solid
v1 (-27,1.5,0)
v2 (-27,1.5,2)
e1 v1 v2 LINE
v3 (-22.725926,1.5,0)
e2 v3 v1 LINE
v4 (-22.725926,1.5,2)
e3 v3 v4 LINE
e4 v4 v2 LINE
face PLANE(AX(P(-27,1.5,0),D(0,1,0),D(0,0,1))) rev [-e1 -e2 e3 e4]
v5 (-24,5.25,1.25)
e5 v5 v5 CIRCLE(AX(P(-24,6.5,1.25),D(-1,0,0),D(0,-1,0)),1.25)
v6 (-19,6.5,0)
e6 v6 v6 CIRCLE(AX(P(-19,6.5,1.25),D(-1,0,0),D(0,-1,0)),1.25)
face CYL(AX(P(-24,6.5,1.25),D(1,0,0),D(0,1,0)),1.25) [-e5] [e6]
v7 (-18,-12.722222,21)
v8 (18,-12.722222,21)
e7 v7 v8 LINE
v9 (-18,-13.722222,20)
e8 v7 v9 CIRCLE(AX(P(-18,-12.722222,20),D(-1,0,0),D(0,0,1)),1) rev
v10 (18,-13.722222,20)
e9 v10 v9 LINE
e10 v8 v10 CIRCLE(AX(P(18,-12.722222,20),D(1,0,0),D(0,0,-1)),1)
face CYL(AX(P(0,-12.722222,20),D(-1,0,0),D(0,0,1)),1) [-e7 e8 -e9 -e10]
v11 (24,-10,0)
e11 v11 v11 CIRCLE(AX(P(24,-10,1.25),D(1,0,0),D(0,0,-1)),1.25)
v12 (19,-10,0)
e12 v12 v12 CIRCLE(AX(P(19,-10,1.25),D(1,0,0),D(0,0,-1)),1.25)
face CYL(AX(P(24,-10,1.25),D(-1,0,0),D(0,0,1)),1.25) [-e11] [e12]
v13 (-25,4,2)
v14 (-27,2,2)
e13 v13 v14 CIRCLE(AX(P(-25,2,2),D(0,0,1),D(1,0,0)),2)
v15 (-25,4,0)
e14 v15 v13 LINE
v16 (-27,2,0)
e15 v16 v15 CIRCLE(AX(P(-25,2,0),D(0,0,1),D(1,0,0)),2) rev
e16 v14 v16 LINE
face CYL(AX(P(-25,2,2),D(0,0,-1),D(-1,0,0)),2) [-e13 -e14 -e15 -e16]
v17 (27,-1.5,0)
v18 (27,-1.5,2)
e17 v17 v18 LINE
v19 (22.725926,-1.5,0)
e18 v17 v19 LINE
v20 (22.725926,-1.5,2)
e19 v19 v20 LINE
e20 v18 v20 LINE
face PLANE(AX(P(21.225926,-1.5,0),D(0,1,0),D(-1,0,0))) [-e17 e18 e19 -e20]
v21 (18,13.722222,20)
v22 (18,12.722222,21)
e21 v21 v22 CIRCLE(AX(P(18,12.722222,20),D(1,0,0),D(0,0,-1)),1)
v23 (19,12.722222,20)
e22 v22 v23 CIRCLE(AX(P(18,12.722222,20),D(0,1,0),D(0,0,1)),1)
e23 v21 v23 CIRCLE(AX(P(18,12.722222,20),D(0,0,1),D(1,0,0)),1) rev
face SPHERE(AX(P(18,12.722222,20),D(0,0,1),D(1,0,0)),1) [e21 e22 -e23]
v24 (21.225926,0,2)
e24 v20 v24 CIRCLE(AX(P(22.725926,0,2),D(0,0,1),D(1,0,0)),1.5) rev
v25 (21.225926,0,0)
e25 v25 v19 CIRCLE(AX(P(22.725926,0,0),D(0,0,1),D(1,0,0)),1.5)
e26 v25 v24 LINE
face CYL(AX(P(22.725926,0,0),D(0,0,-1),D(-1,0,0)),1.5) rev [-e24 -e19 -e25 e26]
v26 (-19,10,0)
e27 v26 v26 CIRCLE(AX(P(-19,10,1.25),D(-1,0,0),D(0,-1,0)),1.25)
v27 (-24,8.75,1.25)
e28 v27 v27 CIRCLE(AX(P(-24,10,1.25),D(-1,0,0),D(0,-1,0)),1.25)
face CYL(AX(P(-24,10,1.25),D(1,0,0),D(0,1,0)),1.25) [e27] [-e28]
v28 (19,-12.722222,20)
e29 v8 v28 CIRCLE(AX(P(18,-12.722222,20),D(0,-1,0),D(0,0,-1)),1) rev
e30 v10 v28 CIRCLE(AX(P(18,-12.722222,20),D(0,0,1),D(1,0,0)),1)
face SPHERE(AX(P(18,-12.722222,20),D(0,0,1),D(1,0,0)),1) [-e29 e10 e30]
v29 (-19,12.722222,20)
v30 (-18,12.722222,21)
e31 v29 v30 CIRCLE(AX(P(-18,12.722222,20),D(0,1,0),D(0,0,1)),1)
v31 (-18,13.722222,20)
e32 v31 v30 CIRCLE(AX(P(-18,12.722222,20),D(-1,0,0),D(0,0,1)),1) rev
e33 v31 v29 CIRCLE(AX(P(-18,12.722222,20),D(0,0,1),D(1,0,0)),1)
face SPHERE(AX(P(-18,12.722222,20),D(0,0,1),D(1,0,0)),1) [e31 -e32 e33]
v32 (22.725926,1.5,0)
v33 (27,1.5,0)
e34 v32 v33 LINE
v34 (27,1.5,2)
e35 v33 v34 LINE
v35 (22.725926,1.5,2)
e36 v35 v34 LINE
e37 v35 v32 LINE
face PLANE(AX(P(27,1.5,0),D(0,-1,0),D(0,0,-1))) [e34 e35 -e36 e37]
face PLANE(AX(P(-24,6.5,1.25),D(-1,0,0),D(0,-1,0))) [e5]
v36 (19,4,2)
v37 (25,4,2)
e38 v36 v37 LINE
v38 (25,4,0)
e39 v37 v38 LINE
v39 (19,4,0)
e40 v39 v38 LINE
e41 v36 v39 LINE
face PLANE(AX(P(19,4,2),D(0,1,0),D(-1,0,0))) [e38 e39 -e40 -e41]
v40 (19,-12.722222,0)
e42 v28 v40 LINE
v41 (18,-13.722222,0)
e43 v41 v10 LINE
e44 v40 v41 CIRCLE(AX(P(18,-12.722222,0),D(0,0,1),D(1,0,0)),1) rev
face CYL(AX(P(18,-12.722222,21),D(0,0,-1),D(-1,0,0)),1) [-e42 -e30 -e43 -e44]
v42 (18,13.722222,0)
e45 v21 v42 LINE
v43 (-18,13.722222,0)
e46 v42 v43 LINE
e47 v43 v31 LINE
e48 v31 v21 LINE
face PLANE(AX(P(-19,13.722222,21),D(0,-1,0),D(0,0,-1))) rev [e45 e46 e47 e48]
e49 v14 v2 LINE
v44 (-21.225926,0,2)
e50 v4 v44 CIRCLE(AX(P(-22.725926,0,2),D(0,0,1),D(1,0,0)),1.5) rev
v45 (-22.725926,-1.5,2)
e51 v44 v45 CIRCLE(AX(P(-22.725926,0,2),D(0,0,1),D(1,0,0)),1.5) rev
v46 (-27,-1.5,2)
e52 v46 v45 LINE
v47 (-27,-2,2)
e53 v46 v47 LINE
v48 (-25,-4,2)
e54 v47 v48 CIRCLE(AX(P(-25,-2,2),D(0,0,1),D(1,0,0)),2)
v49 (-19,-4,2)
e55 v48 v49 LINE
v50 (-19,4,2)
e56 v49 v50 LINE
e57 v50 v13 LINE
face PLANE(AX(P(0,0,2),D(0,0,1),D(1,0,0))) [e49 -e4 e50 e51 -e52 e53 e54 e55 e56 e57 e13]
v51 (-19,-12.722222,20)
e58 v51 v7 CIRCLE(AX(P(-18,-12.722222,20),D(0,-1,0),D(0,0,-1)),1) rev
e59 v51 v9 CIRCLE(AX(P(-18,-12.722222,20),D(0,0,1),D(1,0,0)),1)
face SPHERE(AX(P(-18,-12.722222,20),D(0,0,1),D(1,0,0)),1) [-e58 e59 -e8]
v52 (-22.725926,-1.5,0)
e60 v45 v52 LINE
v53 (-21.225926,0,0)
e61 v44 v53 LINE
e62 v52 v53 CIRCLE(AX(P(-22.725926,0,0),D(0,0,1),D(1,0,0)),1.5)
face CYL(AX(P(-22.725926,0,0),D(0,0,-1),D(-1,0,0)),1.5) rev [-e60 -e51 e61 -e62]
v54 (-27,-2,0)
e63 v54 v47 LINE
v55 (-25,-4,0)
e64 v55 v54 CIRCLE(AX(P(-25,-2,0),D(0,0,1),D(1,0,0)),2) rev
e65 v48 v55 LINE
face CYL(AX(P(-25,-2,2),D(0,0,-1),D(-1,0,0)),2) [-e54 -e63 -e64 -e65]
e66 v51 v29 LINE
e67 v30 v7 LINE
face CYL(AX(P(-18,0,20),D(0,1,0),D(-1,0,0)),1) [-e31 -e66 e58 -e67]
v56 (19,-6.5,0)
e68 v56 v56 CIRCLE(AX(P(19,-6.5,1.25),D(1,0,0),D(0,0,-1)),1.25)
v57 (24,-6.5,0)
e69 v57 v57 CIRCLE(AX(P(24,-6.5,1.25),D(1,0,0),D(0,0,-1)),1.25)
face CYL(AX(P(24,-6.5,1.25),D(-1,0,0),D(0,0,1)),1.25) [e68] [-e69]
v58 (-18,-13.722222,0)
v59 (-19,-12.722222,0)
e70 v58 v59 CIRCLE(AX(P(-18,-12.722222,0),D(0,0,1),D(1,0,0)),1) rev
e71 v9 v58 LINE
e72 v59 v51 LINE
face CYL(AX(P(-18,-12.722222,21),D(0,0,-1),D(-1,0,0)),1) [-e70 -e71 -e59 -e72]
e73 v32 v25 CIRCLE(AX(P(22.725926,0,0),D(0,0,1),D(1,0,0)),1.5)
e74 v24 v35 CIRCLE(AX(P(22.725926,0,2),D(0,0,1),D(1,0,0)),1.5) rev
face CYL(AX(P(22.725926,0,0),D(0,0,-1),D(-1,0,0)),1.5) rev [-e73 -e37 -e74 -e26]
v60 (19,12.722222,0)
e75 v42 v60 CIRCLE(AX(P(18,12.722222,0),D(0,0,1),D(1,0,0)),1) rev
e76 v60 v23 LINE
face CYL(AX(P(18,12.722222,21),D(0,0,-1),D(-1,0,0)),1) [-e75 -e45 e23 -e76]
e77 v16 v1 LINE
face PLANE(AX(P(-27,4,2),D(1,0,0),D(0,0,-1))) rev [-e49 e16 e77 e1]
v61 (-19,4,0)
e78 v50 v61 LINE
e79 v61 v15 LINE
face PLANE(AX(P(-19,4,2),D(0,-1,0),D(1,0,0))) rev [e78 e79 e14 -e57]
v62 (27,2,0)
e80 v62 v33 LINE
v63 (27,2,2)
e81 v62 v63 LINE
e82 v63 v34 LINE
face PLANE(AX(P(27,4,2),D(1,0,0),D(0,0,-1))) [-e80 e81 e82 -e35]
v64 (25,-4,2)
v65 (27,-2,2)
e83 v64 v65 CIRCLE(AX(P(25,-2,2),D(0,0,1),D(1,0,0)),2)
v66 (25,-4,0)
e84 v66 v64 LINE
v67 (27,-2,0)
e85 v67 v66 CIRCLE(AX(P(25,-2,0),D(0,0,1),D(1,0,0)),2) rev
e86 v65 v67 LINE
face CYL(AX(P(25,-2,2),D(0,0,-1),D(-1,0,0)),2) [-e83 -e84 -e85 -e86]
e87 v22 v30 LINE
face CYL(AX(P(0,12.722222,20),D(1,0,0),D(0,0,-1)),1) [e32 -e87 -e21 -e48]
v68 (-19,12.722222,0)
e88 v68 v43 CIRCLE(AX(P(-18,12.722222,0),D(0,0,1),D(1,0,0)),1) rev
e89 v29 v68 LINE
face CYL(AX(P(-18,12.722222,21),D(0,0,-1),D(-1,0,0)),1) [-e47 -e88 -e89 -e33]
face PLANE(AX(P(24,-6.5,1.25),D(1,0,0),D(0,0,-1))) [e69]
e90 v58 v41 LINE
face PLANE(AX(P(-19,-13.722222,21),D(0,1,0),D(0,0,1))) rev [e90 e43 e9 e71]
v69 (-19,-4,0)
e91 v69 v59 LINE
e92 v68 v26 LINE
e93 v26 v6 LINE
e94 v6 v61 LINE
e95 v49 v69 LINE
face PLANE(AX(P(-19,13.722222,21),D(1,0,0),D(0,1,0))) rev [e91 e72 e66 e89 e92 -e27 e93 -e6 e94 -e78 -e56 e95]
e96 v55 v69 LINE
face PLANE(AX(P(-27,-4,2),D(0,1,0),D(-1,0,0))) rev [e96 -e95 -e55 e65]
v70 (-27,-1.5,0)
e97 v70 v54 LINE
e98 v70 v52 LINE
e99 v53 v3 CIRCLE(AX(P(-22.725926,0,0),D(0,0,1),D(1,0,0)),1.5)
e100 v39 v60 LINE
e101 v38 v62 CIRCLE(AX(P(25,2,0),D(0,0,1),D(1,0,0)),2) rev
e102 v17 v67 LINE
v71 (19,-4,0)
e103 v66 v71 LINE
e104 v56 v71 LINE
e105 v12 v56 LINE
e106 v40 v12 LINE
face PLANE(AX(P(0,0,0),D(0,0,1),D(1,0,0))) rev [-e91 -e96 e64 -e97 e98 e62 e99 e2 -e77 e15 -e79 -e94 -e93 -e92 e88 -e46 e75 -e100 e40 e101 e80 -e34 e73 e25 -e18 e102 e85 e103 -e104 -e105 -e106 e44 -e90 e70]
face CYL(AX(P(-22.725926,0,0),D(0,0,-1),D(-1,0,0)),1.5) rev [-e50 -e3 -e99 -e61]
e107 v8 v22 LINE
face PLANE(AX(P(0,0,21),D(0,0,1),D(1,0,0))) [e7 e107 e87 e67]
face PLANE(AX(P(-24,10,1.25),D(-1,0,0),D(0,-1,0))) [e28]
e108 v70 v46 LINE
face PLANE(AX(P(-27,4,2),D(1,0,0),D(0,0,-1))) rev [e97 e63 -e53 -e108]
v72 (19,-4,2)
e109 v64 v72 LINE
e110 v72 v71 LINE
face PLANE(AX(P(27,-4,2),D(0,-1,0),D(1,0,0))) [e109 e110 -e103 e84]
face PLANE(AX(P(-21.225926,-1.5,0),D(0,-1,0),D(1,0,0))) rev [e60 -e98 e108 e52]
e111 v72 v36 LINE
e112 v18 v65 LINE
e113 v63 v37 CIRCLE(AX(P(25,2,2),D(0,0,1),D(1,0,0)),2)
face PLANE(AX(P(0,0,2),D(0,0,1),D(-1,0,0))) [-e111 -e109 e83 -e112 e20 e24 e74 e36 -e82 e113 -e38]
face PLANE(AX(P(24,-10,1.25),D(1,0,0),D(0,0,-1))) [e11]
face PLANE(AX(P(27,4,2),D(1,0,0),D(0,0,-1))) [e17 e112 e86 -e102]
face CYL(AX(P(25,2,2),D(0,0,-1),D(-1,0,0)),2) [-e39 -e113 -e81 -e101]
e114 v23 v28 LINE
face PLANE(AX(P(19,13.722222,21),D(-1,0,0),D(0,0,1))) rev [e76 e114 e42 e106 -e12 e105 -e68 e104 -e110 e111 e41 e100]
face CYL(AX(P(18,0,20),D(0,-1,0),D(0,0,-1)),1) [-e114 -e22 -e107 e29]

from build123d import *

# Parameters (mm, degrees)
SKETCH1_W            = 38
SKETCH1_H            = 27.444444444
BOSS_EXTRUDE1_DEPTH  = 21
SKETCH2_W            = 8
SKETCH2_H            = 8
BOSS_EXTRUDE2_DEPTH  = 2
SKETCH3_W            = 5.774074058
SKETCH3_H            = 3
CUT_EXTRUDE1_DEPTH   = 2
FILLET1_R            = 2
FILLET2_R            = 1.5
FILLET1_OF_MIRROR1_R = 2
FILLET2_OF_MIRROR1_R = 1.5
SKETCH5_R            = 1.25
BOSS_EXTRUDE3_DEPTH  = 5
SKETCH6_R            = 1.25
BOSS_EXTRUDE4_DEPTH  = 5
FILLET5_R            = 1


with BuildPart() as part:
    # Sketch1 → Boss-Extrude1 (new body)
    with BuildSketch(Plane.XY):
        Rectangle(SKETCH1_W, SKETCH1_H)
    extrude(amount=BOSS_EXTRUDE1_DEPTH)

    # Sketch2 → Boss-Extrude2 (add)
    with BuildSketch(Plane.XY):
        with Locations((-23, 0)):
            Rectangle(SKETCH2_W, SKETCH2_H)
    boss_extrude2 = extrude(amount=BOSS_EXTRUDE2_DEPTH)

    # Sketch3 → Cut-Extrude1 (cut)
    with BuildSketch(Plane.XY.offset(2)):
        with Locations((-24.112962971, 0)):
            Rectangle(SKETCH3_W, SKETCH3_H)
    cut_extrude1 = extrude(amount=-CUT_EXTRUDE1_DEPTH, mode=Mode.SUBTRACT)

    # Fillet1
    fillet1_edges = [part.edges().sort_by_distance(p)[0] for p in [
        (-27, -4, 1),
        (-27, 4, 1),
    ]]
    fillet(fillet1_edges, radius=FILLET1_R)

    # Fillet2
    fillet2_edges = [part.edges().sort_by_distance(p)[0] for p in [
        (-21.225925942, 1.5, 1),
        (-21.225925942, -1.5, 1),
    ]]
    fillet(fillet2_edges, radius=FILLET2_R - 0.0001)  # a hair under: the kernel refuses the full size

    # Mirror1: Boss-Extrude2, Cut-Extrude1 across plane
    add(boss_extrude2.mirror(Plane(origin=(0, 0, 0), x_dir=(0, 0, 1), z_dir=(1, 0, 0))))
    add(cut_extrude1.mirror(Plane(origin=(0, 0, 0), x_dir=(0, 0, 1), z_dir=(1, 0, 0))), mode=Mode.SUBTRACT)

    # Fillet1 of Mirror1
    fillet1_of_mirror1_edges = [part.edges().sort_by_distance(p)[0] for p in [
        (27, -4, 1),
        (27, 4, 1),
    ]]
    fillet(fillet1_of_mirror1_edges, radius=FILLET1_OF_MIRROR1_R)

    # Fillet2 of Mirror1
    fillet2_of_mirror1_edges = [part.edges().sort_by_distance(p)[0] for p in [
        (21.225925942, 1.5, 1),
        (21.225925942, -1.5, 1),
    ]]
    fillet(fillet2_of_mirror1_edges, radius=FILLET2_OF_MIRROR1_R - 0.0001)  # a hair under: the kernel refuses the full size

    # Sketch5 → Boss-Extrude3 (add)
    with BuildSketch(Plane.ZY.offset(19)):
        with Locations(Location((1.25, 10, 0), (0, 0, 180))):
            Circle(SKETCH5_R)
        with Locations(Location((1.25, 6.5, 0), (0, 0, 180))):
            Circle(SKETCH5_R)
    extrude(amount=BOSS_EXTRUDE3_DEPTH)

    # Sketch6 → Boss-Extrude4 (add)
    with BuildSketch(Plane(origin=(19, 0, 0), x_dir=(0, 0, -1), z_dir=(1, 0, 0))):
        with Locations((-1.25, -6.5)):
            Circle(SKETCH6_R)
        with Locations((-1.25, -10)):
            Circle(SKETCH6_R)
    extrude(amount=BOSS_EXTRUDE4_DEPTH)

    # Fillet5
    fillet5_edges = [part.edges().sort_by_distance(p)[0] for p in [
        (19, 13.722222222, 10.5),
        (19, -13.722222222, 10.5),
        (-19, -13.722222222, 10.5),
        (-19, 13.722222222, 10.5),
        (19, 0, 21),
        (0, -13.722222222, 21),
        (-19, 0, 21),
        (0, 13.722222222, 21),
    ]]
    fillet(fillet5_edges, radius=FILLET5_R)


solid = part.part
